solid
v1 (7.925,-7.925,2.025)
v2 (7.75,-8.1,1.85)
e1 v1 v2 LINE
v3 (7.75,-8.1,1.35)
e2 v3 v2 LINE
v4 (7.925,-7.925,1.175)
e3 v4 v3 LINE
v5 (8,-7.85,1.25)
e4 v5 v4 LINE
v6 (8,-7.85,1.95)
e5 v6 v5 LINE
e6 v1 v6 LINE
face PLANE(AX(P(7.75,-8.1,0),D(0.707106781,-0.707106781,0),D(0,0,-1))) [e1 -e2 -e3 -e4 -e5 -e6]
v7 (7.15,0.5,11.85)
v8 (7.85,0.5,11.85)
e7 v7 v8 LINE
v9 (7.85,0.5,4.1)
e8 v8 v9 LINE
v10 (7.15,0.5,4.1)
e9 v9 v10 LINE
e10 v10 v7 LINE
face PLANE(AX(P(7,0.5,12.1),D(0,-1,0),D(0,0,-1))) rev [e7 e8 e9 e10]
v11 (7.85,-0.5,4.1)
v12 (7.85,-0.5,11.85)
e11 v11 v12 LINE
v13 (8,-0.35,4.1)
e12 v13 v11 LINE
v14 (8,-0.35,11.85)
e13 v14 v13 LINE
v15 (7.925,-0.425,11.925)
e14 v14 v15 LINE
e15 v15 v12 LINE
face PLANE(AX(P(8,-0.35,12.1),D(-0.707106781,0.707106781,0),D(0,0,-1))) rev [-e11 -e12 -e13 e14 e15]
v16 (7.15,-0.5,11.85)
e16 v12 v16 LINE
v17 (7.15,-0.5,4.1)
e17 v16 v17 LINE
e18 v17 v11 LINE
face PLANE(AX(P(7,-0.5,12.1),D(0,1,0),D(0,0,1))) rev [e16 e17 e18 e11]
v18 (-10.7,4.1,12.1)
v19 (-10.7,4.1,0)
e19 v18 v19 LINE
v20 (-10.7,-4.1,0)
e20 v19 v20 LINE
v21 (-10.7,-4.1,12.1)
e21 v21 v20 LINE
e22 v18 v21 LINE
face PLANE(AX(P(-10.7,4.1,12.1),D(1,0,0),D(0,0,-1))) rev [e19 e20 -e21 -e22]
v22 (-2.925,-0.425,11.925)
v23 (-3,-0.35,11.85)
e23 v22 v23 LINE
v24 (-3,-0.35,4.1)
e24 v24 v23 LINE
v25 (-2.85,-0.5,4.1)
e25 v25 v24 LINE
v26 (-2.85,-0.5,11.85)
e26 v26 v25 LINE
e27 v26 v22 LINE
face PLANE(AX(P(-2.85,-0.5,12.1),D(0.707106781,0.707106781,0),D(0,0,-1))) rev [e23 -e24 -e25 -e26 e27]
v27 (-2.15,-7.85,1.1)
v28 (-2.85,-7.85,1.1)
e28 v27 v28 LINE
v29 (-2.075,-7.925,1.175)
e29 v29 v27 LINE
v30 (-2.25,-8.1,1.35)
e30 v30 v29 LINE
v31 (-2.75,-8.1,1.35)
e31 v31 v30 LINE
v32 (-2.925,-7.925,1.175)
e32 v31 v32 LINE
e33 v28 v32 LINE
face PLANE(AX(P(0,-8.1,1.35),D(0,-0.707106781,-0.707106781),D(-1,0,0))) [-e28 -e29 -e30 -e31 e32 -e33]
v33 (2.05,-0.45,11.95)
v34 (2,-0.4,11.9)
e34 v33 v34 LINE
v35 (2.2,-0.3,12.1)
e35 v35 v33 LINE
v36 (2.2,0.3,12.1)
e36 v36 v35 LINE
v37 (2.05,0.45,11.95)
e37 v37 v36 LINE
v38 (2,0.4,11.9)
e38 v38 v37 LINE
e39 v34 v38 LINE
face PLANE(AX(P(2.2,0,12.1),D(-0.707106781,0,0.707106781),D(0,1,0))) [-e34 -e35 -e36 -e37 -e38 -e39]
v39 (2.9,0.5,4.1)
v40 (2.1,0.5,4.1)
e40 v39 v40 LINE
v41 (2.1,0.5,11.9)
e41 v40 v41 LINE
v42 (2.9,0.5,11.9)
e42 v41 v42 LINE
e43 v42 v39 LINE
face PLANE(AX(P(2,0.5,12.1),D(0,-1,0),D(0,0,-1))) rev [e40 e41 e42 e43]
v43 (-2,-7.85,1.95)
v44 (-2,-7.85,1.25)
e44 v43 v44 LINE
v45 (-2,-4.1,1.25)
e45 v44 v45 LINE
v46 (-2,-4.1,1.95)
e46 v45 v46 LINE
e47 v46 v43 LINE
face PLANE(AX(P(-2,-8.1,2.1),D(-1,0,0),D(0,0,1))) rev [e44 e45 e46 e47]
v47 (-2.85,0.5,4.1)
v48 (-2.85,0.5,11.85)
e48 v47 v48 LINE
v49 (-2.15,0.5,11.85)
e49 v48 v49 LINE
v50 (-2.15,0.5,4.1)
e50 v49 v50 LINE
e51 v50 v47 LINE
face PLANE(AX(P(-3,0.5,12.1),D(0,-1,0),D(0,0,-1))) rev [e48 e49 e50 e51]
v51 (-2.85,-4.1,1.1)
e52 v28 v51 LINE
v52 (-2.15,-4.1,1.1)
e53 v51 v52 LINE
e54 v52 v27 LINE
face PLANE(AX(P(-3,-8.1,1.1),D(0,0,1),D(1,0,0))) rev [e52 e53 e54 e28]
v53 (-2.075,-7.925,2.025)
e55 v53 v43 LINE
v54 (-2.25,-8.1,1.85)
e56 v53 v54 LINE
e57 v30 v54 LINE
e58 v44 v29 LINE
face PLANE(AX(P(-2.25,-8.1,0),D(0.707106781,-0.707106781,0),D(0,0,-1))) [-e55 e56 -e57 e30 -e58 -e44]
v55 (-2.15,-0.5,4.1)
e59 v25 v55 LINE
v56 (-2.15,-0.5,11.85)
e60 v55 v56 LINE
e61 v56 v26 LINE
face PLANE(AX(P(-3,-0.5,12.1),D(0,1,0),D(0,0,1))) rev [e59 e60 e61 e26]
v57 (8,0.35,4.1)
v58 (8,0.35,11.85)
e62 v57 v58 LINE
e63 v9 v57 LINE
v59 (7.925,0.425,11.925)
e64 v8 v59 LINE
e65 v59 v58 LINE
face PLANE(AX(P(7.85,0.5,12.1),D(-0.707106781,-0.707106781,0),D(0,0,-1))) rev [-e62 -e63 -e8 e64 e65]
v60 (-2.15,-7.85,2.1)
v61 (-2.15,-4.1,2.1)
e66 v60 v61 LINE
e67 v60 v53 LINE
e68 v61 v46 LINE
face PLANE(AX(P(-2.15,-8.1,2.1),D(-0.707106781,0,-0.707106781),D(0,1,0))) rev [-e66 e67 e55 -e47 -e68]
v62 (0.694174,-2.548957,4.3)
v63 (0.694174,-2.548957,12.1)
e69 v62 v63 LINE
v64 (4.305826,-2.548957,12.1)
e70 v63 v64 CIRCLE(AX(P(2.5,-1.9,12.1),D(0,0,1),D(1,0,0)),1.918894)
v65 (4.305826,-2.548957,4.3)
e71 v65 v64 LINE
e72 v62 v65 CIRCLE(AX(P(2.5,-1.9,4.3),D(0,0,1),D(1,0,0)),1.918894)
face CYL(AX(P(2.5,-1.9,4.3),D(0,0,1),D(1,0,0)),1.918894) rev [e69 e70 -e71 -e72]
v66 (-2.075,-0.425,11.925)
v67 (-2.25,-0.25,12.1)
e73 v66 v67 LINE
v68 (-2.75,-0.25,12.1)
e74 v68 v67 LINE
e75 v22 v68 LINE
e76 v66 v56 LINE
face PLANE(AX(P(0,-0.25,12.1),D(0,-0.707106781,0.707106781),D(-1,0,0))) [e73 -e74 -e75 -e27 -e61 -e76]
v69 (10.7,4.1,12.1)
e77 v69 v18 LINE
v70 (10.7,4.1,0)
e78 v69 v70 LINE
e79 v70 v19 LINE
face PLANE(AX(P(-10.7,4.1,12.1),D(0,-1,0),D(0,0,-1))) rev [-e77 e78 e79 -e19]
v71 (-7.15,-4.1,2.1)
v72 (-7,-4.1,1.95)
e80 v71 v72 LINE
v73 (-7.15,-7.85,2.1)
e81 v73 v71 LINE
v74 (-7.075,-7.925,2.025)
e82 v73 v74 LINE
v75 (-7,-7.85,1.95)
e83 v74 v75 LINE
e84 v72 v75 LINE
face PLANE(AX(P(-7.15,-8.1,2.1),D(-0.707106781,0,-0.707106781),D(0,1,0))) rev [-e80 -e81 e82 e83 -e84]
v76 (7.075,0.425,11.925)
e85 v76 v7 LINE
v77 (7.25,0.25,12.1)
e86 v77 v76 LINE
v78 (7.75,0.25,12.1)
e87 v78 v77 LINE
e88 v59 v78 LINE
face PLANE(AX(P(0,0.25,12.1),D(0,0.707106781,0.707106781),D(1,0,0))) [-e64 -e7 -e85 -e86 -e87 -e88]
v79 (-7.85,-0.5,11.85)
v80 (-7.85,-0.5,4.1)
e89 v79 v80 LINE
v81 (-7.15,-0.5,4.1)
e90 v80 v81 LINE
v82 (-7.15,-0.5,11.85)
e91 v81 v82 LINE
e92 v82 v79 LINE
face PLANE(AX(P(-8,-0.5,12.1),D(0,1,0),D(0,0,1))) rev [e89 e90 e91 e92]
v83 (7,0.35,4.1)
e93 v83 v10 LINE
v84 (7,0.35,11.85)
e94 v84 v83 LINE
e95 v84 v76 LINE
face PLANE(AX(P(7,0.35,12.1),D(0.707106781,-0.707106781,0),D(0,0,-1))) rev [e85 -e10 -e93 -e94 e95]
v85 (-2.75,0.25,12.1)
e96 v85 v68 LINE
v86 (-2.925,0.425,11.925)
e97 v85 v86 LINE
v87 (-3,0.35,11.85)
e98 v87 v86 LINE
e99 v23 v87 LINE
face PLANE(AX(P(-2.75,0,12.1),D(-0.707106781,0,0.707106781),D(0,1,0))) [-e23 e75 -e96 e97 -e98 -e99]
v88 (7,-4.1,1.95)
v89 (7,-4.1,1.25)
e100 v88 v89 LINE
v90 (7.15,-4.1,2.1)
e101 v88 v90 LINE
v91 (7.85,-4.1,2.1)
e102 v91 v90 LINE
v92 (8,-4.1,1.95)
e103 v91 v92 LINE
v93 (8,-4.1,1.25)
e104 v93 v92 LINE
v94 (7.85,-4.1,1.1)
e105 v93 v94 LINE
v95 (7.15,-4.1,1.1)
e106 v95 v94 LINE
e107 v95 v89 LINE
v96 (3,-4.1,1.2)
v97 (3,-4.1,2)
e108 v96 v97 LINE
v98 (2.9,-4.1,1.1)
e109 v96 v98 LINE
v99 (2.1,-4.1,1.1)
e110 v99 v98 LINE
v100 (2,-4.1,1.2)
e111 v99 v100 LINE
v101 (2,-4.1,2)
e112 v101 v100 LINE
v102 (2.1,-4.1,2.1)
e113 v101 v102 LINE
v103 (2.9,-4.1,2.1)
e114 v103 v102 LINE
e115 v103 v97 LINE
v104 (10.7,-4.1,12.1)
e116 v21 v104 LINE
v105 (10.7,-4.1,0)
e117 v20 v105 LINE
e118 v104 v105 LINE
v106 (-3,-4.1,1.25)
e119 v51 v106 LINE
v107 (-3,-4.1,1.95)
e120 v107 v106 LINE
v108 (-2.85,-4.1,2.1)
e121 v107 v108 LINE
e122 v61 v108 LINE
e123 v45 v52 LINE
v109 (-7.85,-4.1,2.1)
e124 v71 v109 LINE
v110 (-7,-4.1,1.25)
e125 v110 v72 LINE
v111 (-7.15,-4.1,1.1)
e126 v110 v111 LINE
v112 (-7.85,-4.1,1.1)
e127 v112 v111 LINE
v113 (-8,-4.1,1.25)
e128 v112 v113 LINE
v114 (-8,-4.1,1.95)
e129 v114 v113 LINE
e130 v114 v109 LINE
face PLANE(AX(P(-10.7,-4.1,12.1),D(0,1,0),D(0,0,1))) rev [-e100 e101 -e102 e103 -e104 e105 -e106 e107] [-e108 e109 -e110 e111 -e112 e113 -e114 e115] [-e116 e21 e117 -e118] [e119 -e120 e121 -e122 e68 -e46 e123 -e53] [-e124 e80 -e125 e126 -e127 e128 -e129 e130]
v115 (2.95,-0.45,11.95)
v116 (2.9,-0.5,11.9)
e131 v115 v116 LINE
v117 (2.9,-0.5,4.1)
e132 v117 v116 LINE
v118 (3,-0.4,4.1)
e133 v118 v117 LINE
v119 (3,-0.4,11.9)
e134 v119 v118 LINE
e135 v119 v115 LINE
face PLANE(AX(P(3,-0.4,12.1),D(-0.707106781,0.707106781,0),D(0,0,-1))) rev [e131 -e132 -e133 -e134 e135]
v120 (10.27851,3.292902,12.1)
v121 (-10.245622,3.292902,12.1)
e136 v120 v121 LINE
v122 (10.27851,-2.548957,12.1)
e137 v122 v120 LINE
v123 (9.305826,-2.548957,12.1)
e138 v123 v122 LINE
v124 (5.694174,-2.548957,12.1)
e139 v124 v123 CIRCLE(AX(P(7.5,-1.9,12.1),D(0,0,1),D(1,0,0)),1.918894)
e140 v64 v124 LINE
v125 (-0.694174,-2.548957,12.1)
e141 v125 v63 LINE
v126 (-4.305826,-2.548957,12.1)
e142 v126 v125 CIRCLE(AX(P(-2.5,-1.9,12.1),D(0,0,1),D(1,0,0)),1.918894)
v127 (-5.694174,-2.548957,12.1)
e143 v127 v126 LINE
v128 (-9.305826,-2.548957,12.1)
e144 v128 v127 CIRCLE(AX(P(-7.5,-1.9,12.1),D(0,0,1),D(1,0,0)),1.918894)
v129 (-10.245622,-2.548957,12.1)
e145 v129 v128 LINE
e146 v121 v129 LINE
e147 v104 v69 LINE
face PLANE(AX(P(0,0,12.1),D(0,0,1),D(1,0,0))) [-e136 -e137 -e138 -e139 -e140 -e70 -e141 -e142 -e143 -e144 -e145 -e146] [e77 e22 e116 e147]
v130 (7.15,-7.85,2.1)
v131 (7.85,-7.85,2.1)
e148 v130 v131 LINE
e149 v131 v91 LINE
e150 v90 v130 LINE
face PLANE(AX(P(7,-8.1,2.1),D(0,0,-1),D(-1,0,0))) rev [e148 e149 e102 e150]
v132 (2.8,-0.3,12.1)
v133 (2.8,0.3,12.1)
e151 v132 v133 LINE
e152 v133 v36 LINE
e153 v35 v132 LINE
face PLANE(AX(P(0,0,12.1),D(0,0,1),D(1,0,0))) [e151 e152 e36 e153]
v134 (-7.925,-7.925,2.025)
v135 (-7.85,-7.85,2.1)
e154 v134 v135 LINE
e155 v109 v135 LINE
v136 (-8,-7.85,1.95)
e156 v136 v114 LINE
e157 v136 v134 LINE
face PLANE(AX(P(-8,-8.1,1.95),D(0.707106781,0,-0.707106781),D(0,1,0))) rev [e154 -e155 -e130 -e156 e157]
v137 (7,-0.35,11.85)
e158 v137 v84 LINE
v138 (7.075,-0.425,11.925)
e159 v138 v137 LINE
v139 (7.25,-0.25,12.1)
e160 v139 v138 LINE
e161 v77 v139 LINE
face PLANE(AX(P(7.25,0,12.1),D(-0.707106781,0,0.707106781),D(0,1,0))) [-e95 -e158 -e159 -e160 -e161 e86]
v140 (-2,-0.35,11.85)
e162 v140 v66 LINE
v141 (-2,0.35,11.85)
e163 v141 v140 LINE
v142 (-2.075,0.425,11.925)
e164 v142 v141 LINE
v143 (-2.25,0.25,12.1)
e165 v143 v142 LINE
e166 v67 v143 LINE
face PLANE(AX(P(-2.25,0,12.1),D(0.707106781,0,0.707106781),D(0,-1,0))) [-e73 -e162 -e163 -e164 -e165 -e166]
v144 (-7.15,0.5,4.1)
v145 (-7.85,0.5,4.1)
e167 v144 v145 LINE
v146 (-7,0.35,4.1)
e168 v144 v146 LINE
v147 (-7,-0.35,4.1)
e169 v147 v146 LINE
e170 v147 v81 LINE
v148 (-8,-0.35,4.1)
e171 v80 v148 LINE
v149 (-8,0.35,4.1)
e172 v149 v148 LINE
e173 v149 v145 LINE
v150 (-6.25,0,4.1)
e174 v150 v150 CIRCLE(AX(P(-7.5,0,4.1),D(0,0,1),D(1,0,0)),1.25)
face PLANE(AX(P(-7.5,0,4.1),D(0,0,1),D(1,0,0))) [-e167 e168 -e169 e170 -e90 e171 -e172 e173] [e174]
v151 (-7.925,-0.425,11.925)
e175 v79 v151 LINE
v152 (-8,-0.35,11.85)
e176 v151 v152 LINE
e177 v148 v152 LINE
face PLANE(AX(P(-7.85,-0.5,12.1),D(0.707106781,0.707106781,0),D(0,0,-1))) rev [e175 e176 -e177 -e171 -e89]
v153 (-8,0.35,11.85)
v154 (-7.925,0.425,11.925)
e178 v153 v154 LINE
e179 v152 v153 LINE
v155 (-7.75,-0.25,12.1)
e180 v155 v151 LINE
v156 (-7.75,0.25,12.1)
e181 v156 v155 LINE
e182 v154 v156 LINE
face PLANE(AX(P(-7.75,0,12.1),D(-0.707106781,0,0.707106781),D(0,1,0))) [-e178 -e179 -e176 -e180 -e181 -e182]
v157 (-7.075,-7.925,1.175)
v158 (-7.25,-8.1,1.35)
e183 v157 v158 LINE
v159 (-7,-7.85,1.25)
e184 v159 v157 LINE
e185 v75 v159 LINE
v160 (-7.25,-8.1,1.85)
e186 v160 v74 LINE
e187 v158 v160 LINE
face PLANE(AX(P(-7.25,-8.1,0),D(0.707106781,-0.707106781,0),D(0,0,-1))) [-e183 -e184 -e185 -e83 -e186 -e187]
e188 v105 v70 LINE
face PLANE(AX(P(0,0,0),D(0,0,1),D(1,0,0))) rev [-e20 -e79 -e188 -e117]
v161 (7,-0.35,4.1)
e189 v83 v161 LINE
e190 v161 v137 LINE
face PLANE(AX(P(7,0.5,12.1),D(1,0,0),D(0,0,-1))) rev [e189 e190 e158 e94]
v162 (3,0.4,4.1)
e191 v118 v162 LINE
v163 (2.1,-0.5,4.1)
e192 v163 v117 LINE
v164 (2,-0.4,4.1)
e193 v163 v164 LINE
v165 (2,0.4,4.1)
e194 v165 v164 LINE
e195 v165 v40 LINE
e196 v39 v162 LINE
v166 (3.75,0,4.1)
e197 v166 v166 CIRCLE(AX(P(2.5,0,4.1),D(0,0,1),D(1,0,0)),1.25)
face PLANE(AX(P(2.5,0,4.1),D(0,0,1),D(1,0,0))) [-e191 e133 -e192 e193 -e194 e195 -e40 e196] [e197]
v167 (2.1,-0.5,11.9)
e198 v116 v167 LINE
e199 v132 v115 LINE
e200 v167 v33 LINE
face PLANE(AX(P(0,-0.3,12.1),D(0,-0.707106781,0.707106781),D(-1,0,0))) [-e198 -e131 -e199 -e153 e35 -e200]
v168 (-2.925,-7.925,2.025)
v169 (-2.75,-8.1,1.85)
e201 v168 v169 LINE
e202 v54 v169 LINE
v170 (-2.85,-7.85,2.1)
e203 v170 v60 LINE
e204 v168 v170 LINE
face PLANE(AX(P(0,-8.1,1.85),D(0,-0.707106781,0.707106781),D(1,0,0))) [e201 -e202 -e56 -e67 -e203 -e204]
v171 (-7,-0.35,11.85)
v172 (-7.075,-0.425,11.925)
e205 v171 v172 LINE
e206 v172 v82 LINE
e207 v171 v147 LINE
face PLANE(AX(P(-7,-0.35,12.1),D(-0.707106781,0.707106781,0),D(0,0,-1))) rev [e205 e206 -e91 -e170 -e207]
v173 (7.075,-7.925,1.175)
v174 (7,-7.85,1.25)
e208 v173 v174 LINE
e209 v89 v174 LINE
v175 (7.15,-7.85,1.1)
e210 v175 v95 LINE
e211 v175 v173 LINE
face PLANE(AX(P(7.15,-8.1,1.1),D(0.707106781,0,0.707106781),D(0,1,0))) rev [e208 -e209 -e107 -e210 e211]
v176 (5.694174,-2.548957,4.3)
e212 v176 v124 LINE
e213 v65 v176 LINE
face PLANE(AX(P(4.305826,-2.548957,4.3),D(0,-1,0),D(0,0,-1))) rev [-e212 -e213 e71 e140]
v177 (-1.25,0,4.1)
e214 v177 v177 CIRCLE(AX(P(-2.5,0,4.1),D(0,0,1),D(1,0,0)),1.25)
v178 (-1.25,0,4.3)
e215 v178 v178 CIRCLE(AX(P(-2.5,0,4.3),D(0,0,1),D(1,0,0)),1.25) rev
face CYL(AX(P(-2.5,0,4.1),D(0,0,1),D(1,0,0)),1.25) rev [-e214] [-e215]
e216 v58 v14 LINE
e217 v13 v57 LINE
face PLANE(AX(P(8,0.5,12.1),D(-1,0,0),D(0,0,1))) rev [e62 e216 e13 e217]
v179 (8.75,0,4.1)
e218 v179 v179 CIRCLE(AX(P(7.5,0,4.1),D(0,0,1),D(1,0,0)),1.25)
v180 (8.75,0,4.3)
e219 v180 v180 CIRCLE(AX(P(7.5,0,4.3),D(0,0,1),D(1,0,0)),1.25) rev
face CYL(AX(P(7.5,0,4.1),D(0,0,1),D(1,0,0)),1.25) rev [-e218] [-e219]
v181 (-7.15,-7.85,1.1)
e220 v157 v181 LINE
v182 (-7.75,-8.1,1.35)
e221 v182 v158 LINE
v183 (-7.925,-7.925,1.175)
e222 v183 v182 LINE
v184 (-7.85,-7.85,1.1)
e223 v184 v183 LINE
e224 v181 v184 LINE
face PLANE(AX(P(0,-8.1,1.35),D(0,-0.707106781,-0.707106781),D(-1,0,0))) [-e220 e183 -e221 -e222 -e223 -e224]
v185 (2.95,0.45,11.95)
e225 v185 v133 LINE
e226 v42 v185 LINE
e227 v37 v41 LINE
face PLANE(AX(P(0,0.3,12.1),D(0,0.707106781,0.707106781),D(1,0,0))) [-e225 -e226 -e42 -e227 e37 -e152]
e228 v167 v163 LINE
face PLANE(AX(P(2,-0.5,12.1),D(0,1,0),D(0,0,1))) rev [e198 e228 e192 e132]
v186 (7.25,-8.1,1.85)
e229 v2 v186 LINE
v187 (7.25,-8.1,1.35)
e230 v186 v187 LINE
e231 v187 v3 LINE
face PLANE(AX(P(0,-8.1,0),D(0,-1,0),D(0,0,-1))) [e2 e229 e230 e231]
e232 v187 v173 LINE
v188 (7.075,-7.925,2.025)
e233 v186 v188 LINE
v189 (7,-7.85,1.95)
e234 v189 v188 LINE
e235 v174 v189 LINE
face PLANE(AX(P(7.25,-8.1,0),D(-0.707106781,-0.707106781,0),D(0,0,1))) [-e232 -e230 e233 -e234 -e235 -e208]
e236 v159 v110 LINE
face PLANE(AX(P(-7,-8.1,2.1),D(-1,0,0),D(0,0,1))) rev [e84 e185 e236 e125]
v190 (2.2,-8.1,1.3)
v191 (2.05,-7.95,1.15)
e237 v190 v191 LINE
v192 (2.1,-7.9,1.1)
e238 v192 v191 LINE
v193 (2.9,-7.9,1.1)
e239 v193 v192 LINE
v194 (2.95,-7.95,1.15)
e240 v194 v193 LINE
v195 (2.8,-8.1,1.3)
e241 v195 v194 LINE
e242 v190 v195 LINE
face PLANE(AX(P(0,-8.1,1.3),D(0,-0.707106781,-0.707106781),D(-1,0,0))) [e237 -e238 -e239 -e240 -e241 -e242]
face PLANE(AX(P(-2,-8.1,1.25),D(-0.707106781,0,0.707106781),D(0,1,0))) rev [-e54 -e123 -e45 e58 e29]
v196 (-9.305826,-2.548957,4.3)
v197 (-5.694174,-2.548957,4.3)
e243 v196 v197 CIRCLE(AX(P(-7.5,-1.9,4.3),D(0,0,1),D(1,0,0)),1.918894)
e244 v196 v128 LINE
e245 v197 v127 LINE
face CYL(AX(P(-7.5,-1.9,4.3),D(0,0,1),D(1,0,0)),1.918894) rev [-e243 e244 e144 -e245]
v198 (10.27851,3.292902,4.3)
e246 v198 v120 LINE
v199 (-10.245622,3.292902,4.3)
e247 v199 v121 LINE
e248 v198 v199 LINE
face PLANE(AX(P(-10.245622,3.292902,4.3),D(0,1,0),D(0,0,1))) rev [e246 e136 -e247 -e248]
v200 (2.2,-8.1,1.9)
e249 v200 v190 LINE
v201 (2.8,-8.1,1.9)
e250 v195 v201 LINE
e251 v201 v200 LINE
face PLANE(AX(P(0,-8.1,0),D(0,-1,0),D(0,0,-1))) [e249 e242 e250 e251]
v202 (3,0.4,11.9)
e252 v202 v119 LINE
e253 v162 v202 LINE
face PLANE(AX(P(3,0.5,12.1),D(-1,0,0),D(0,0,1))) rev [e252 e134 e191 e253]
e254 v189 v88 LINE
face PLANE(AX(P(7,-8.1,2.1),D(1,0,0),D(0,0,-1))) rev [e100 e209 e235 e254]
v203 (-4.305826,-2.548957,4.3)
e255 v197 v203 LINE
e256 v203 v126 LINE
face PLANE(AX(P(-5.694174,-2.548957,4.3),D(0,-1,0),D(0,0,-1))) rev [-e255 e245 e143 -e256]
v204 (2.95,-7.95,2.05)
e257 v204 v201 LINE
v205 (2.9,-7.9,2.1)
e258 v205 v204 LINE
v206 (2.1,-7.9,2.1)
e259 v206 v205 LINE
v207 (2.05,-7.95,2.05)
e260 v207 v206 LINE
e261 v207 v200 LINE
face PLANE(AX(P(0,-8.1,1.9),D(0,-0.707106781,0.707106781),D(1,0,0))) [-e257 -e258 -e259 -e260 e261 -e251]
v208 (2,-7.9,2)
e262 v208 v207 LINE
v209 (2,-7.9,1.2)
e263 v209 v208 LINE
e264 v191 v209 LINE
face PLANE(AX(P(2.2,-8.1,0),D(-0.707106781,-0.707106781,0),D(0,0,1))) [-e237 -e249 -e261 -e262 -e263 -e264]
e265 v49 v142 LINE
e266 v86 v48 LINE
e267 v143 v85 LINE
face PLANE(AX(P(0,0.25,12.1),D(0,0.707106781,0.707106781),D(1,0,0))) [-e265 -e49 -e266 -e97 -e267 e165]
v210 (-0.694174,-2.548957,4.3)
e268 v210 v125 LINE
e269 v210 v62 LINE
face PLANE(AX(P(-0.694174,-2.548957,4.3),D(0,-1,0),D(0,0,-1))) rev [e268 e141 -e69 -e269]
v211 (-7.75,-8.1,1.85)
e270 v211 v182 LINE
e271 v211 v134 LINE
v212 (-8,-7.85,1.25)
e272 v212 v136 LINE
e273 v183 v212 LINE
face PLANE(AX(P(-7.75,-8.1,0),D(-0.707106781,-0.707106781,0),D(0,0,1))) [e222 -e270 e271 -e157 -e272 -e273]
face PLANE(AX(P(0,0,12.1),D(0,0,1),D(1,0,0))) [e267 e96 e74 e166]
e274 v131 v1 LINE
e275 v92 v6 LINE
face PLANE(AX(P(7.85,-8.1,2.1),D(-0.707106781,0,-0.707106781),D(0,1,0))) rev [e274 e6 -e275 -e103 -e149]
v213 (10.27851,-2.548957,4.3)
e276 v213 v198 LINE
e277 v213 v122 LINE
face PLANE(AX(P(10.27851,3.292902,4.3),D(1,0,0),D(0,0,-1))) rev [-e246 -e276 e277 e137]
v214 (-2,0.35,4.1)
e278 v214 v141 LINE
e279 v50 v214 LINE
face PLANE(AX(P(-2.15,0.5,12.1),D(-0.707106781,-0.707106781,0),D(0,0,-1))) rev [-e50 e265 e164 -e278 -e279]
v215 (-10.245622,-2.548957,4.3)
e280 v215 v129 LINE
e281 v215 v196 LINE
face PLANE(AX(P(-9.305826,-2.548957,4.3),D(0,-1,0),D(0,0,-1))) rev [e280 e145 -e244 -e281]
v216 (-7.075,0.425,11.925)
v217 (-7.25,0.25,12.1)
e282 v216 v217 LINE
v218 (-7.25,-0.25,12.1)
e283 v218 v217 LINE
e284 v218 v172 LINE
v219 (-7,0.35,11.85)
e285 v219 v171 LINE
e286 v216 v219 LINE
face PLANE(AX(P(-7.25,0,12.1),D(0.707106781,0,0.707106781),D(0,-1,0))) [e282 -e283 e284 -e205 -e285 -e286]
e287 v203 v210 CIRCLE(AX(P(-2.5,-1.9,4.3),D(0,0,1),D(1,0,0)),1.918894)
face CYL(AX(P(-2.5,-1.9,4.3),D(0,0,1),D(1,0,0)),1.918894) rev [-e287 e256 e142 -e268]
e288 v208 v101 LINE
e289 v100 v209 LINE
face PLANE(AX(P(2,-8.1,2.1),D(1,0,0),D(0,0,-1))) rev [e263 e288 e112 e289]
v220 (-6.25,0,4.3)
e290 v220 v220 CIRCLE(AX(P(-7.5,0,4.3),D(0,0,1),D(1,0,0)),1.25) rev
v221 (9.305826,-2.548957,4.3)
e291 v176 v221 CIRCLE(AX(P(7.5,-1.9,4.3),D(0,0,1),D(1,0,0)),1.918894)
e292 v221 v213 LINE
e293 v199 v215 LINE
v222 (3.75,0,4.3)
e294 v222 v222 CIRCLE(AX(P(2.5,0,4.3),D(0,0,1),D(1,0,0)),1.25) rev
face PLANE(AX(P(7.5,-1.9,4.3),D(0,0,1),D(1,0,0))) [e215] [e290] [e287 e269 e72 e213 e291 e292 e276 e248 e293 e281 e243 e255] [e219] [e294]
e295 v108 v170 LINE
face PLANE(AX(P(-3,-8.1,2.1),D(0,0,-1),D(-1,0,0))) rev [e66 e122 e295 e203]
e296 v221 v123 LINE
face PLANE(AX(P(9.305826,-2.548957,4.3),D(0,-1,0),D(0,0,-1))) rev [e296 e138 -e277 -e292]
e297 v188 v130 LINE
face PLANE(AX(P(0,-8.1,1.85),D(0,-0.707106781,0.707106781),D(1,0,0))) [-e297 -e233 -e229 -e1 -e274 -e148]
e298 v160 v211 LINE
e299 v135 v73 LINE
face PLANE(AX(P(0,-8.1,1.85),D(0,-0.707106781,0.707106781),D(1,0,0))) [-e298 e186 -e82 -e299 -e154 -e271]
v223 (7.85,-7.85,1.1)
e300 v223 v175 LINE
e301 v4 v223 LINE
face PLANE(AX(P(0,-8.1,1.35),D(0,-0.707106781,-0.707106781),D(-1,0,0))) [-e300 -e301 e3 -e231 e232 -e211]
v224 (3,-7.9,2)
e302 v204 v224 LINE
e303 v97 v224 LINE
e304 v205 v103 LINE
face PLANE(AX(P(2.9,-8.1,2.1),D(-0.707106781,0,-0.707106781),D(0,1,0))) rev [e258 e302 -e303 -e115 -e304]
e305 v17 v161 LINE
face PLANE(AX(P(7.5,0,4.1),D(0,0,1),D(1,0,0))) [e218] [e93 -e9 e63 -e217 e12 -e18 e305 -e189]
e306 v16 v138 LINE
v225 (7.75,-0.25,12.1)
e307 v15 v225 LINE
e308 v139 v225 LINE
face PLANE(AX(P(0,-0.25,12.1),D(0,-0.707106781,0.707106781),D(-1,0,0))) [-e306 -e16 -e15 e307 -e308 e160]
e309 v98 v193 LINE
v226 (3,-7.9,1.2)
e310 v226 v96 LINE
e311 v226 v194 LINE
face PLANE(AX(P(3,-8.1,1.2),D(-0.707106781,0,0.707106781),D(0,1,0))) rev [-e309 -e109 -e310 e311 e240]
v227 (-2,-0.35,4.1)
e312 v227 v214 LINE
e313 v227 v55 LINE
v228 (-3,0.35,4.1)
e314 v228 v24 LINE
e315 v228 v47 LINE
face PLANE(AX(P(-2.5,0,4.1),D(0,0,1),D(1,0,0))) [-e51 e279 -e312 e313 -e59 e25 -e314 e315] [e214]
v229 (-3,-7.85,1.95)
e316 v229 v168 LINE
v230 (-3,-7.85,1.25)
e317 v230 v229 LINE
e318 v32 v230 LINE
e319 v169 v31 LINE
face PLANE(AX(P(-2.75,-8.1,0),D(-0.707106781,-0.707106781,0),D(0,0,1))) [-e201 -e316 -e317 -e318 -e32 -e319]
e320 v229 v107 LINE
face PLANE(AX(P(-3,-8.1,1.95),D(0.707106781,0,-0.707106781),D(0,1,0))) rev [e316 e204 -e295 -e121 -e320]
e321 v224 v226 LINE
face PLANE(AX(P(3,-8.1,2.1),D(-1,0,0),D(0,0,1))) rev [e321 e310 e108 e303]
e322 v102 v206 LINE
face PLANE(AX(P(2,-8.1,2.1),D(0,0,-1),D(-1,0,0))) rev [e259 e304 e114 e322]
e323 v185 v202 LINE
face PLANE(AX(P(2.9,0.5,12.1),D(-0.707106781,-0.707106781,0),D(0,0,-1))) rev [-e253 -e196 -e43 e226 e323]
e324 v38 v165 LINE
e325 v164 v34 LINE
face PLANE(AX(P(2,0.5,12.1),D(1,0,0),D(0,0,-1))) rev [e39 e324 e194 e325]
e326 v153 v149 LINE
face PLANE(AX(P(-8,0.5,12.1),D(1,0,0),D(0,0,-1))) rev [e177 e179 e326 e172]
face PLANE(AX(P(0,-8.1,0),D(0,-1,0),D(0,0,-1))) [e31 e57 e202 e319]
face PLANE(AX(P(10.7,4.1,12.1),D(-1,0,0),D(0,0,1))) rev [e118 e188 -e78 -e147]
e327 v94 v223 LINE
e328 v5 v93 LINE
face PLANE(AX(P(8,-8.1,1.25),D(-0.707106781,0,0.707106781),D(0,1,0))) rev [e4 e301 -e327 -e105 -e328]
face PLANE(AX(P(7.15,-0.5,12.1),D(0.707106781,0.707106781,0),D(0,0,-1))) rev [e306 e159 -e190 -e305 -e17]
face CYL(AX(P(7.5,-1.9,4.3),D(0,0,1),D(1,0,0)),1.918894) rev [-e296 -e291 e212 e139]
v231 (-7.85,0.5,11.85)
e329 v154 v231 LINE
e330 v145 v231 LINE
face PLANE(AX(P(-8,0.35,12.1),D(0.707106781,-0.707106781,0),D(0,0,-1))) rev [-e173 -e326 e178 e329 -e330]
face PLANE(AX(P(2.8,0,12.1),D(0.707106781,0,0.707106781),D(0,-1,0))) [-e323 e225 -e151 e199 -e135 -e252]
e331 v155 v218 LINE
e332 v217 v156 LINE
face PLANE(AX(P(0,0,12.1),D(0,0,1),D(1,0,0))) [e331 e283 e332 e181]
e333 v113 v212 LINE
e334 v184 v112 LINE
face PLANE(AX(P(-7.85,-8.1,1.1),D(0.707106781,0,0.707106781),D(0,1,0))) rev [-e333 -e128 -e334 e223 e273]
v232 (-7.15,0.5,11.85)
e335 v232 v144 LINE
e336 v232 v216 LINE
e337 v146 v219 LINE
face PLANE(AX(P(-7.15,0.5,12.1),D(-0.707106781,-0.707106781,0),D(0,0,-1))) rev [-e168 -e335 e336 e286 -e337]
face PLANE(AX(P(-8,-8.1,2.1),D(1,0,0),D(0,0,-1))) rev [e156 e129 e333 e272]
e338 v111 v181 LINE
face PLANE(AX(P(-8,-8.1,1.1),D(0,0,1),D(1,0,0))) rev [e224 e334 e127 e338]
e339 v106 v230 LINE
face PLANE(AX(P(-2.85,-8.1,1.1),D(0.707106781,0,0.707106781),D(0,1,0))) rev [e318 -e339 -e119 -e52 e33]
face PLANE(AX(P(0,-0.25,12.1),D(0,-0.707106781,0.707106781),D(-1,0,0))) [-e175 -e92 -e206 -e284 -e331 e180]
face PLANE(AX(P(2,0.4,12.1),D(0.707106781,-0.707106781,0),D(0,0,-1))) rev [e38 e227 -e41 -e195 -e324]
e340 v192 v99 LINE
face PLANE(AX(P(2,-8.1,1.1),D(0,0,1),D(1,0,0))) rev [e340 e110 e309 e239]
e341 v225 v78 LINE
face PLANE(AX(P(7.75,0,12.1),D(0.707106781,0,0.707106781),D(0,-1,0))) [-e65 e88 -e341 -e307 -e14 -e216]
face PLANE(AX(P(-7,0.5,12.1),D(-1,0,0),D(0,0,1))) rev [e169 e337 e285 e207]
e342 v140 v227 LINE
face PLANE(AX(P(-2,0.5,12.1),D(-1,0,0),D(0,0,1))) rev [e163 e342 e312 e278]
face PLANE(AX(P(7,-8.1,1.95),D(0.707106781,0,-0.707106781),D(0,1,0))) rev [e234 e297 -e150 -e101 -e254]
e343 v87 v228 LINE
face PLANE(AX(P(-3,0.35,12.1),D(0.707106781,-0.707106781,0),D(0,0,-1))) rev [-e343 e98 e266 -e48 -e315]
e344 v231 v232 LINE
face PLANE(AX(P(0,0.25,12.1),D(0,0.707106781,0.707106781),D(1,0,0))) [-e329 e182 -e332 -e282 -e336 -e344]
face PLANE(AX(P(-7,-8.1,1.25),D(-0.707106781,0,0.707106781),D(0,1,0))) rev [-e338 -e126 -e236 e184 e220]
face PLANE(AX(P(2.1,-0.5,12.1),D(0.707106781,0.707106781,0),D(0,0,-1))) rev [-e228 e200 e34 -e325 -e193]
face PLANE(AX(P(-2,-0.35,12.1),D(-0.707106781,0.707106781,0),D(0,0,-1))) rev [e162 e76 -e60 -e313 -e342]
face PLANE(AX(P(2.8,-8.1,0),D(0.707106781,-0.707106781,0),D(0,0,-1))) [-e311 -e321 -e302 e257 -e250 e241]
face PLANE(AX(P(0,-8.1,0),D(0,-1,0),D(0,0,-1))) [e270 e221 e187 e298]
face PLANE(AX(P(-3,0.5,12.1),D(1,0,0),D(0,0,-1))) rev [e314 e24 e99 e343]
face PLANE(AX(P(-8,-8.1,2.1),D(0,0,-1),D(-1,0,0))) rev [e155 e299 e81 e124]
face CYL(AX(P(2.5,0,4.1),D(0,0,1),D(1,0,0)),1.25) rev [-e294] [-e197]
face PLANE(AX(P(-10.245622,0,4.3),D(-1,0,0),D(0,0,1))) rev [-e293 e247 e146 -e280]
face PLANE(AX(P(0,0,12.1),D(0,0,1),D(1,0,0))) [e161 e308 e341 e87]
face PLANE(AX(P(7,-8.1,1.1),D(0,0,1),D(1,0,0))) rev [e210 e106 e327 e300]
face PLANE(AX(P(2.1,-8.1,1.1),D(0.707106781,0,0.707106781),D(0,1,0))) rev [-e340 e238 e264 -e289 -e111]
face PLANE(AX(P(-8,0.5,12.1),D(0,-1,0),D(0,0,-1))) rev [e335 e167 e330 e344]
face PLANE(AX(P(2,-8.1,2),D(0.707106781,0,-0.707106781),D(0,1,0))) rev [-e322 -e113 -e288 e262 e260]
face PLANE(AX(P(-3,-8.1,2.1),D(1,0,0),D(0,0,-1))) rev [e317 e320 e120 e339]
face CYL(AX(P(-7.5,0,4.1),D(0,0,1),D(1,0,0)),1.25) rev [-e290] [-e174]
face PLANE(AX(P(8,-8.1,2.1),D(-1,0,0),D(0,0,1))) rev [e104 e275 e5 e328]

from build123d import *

# Parameters (mm, degrees)
SKETCH_1_W          = 21.4
SKETCH_1_H          = 8.2
EXTRUDE_1_DEPTH     = 12.1
SKETCH_4_R          = 1.25
CUT_EXTRUDE_3_DEPTH = 8
CUT_EXTRUDE_4_DEPTH = 7.8
SKETCH_7_W          = 1
SKETCH_7_H          = 1
EXTRUDE_2_DEPTH     = 8
CHAMFER_1_SIZE      = 0.15
CHAMFER_2_SIZE      = 0.25
SKETCH_8_W          = 1
SKETCH_8_H          = 1
EXTRUDE_3_DEPTH     = 4
CHAMFER_3_SIZE      = 0.15
CHAMFER_4_SIZE      = 0.25
CHAMFER_6_SIZE      = 0.1
CHAMFER_7_SIZE      = 0.2
CHAMFER_8_SIZE      = 0.1
CHAMFER_9_SIZE      = 0.2


with BuildPart() as part:
    # Эскиз1 → Бобышка-Вытянуть1 (new body)
    with BuildSketch(Plane.XY):
        Rectangle(SKETCH_1_W, SKETCH_1_H)
    extrude(amount=EXTRUDE_1_DEPTH)

    # Эскиз4 → Вырез-Вытянуть3 (cut)
    with BuildSketch(Plane.XY.offset(12.1)):
        with Locations((-7.5, 0)):
            Circle(SKETCH_4_R)
        with Locations((-2.5, 0)):
            Circle(SKETCH_4_R)
        with Locations((2.5, 0)):
            Circle(SKETCH_4_R)
        with Locations((7.5, 0)):
            Circle(SKETCH_4_R)
    extrude(amount=-CUT_EXTRUDE_3_DEPTH, mode=Mode.SUBTRACT)

    # Эскиз5 → Вырез-Вытянуть4 (cut)
    with BuildSketch(Plane.XY.offset(12.1)):
        with BuildLine():
            Line((-10.245621634, 0), (-10.245621634, 3.292901982))
            Line((-10.245621634, 3.292901982), (0.278509544, 3.292901982))
            Line((0.278509544, 3.292901982), (5.278509544, 3.292901982))
            Line((5.278509544, 3.292901982), (10.278509544, 3.292901982))
            Line((10.278509544, 3.292901982), (10.278509544, -2.548957219))
            Line((10.278509544, -2.548957219), (9.30582632, -2.548957219))
            ThreePointArc((9.30582632, -2.548957219), (7.5, -3.818893996), (5.69417368, -2.548957219))
            Line((5.69417368, -2.548957219), (4.30582632, -2.548957219))
            ThreePointArc((4.30582632, -2.548957219), (2.5, -3.818893996), (0.69417368, -2.548957219))
            Line((0.69417368, -2.548957219), (-0.69417368, -2.548957219))
            ThreePointArc((-0.69417368, -2.548957219), (-2.5, -3.818893996), (-4.30582632, -2.548957219))
            Line((-4.30582632, -2.548957219), (-5.69417368, -2.548957219))
            ThreePointArc((-5.69417368, -2.548957219), (-7.5, -3.818893996), (-9.30582632, -2.548957219))
            Line((-9.30582632, -2.548957219), (-10.245621634, -2.548957219))
            Line((-10.245621634, -2.548957219), (-10.245621634, 0))
        make_face()
    extrude(amount=-CUT_EXTRUDE_4_DEPTH, mode=Mode.SUBTRACT)

    # Эскиз7 → Бобышка-Вытянуть2 (add)
    with BuildSketch(Plane.XY.offset(4.1)):
        with Locations((-2.5, 0)):
            Rectangle(SKETCH_7_W, SKETCH_7_H)
        with Locations((-7.5, 0)):
            Rectangle(SKETCH_7_W, SKETCH_7_H)
        with Locations((2.5, 0)):
            Rectangle(SKETCH_7_W, SKETCH_7_H)
        with Locations((7.5, 0)):
            Rectangle(SKETCH_7_W, SKETCH_7_H)
    extrude(amount=EXTRUDE_2_DEPTH)

    # Фаска1
    chamfer_1_edges = [part.edges().sort_by_distance(p)[0] for p in [
        (-7, -0.5, 8.1),
        (-7, 0.5, 8.1),
        (-8, 0.5, 8.1),
        (-8, -0.5, 8.1),
        (-2, -0.5, 8.1),
        (-2, 0.5, 8.1),
        (-3, 0.5, 8.1),
        (-3, -0.5, 8.1),
    ]]
    chamfer(chamfer_1_edges, length=CHAMFER_1_SIZE)

    # Фаска2
    # the kernel refuses this chamfer: 0.25 mm, written as the material it takes off along each edge
    with BuildSketch(Plane(origin=(-3, -0.992920747, 12.1), x_dir=(-0.02749587661058555, 0, -0.9996219169112968), z_dir=(0, 1, 0)), Plane(origin=(-3.492920747, 0.5, 12.1), x_dir=(0, 0.027495876610586414, -0.9996219169112968), z_dir=(1, 0, 0)), Plane(origin=(-2, 0.992920747, 12.1), x_dir=(0.027495876610586414, 0, -0.9996219169112968), z_dir=(0, -1, 0)), Plane(origin=(-1.507079253, -0.5, 12.1), x_dir=(0, -0.027495876610586414, -0.9996219169112968), z_dir=(-1, 0, 0)), Plane(origin=(-7, 0.992920747, 12.1), x_dir=(0.02749587661058555, 0, -0.9996219169112968), z_dir=(0, -1, 0)), Plane(origin=(-6.507079253, -0.5, 12.1), x_dir=(0, -0.027495876610586414, -0.9996219169112968), z_dir=(-1, 0, 0)), Plane(origin=(-8, -0.992920747, 12.1), x_dir=(-0.027495876610589005, 0, -0.9996219169112968), z_dir=(0, 1, 0)), Plane(origin=(-8.492920747, 0.5, 12.1), x_dir=(0, 0.027495876610586414, -0.9996219169112968), z_dir=(1, 0, 0))) as chamfer_2_piece_1:
        Polygon((CHAMFER_2_SIZE * 0.999621916911, -CHAMFER_2_SIZE * 0.0274958766106), (-CHAMFER_2_SIZE * 0.0274958766106, -CHAMFER_2_SIZE * 0.999621916911), (0, 0), align=None)
    extrude(amount=1.985841494, mode=Mode.SUBTRACT)

    # Эскиз8 → Бобышка-Вытянуть3 (add)
    with BuildSketch(Plane(origin=(0, -4.1, 0), x_dir=(-1, 0, 0), z_dir=(0, -1, 0))):
        with Locations((2.5, -1.6)):
            Rectangle(SKETCH_8_W, SKETCH_8_H)
        with Locations((7.5, -1.6)):
            Rectangle(SKETCH_8_W, SKETCH_8_H)
        with Locations((-2.5, -1.6)):
            Rectangle(SKETCH_8_W, SKETCH_8_H)
        with Locations((-7.5, -1.6)):
            Rectangle(SKETCH_8_W, SKETCH_8_H)
    extrude(amount=EXTRUDE_3_DEPTH)

    # Фаска3
    chamfer_3_edges = [part.edges().sort_by_distance(p)[0] for p in [
        (8, -0.5, 8.1),
        (8, 0.5, 8.1),
        (7, 0.5, 8.1),
        (7, -0.5, 8.1),
        (-7, -6.1, 1.1),
        (-7, -6.1, 2.1),
        (-8, -6.1, 2.1),
        (-8, -6.1, 1.1),
        (-2, -6.1, 1.1),
        (-2, -6.1, 2.1),
        (-3, -6.1, 2.1),
        (-3, -6.1, 1.1),
        (8, -6.1, 1.1),
        (8, -6.1, 2.1),
        (7, -6.1, 2.1),
        (7, -6.1, 1.1),
    ]]
    chamfer(chamfer_3_edges, length=CHAMFER_3_SIZE)

    # Фаска4
    # the kernel refuses this chamfer: 0.25 mm, written as the material it takes off along each edge
    with BuildSketch(Plane(origin=(-2, -8.1, 2.592920747), x_dir=(0.02749587661058651, 0.9996219169112968, 0), z_dir=(0, 0, -1)), Plane(origin=(-3, -8.1, 0.607079253), x_dir=(-0.027495876610585647, 0.9996219169112968, 0), z_dir=(0, 0, 1)), Plane(origin=(-3.492920747, -8.1, 2.1), x_dir=(0, 0.9996219169112968, 0.027495876610585647), z_dir=(1, 0, 0)), Plane(origin=(-1.507079253, -8.1, 1.1), x_dir=(0, 0.9996219169112968, -0.02749587661058651), z_dir=(-1, 0, 0)), Plane(origin=(-8, -8.1, 0.607079253), x_dir=(-0.0274958766105891, 0.9996219169112968, 0), z_dir=(0, 0, 1)), Plane(origin=(-8.492920747, -8.1, 2.1), x_dir=(0, 0.9996219169112968, 0.027495876610585647), z_dir=(1, 0, 0)), Plane(origin=(-7, -8.1, 2.592920747), x_dir=(0.027495876610585647, 0.9996219169112968, 0), z_dir=(0, 0, -1)), Plane(origin=(-6.507079253, -8.1, 1.1), x_dir=(0, 0.9996219169112968, -0.02749587661058651), z_dir=(-1, 0, 0)), Plane(origin=(8.492920747, -8.1, 1.1), x_dir=(0, 0.9996219169112968, -0.02749587661058651), z_dir=(-1, 0, 0)), Plane(origin=(7, -8.1, 0.607079253), x_dir=(-0.027495876610585647, 0.9996219169112968, 0), z_dir=(0, 0, 1)), Plane(origin=(6.507079253, -8.1, 2.1), x_dir=(0, 0.9996219169112968, 0.027495876610585647), z_dir=(1, 0, 0)), Plane(origin=(8, -8.1, 2.592920747), x_dir=(0.0274958766105891, 0.9996219169112968, 0), z_dir=(0, 0, -1)), Plane(origin=(8.492920747, -0.5, 12.1), x_dir=(0, -0.027495876610586414, -0.9996219169112968), z_dir=(-1, 0, 0)), Plane(origin=(7, -0.992920747, 12.1), x_dir=(-0.02749587661058555, 0, -0.9996219169112968), z_dir=(0, 1, 0)), Plane(origin=(8, 0.992920747, 12.1), x_dir=(0.027495876610589005, 0, -0.9996219169112968), z_dir=(0, -1, 0)), Plane(origin=(6.507079253, 0.5, 12.1), x_dir=(0, 0.027495876610586414, -0.9996219169112968), z_dir=(1, 0, 0))) as chamfer_4_piece_1:
        Polygon((CHAMFER_4_SIZE * 0.999621916911, -CHAMFER_4_SIZE * 0.0274958766106), (-CHAMFER_4_SIZE * 0.0274958766106, -CHAMFER_4_SIZE * 0.999621916911), (0, 0), align=None)
    extrude(amount=1.985841494, mode=Mode.SUBTRACT)

    # Фаска6
    chamfer_6_edges = [part.edges().sort_by_distance(p)[0] for p in [
        (3, -0.5, 8.1),
        (3, 0.5, 8.1),
        (2, 0.5, 8.1),
        (2, -0.5, 8.1),
    ]]
    chamfer(chamfer_6_edges, length=CHAMFER_6_SIZE)

    # Фаска7
    # the kernel refuses this chamfer: 0.2 mm, written as the material it takes off along each edge
    with BuildSketch(Plane(origin=(3, 0.914336598, 12.1), x_dir=(0.02749587661058742, 0, -0.9996219169112966), z_dir=(0, -1, 0)), Plane(origin=(3.414336598, -0.5, 12.1), x_dir=(0, -0.02749587661058634, -0.9996219169112966), z_dir=(-1, 0, 0)), Plane(origin=(2, -0.914336598, 12.1), x_dir=(-0.02749587661058634, 0, -0.9996219169112966), z_dir=(0, 1, 0)), Plane(origin=(1.585663402, 0.5, 12.1), x_dir=(0, 0.02749587661058634, -0.9996219169112966), z_dir=(1, 0, 0))) as chamfer_7_piece_1:
        Polygon((CHAMFER_7_SIZE * 0.999621916911, -CHAMFER_7_SIZE * 0.0274958766106), (-CHAMFER_7_SIZE * 0.0274958766106, -CHAMFER_7_SIZE * 0.999621916911), (0, 0), align=None)
    extrude(amount=1.828673195, mode=Mode.SUBTRACT)

    # Фаска8
    chamfer_8_edges = [part.edges().sort_by_distance(p)[0] for p in [
        (3, -6.1, 1.1),
        (3, -6.1, 2.1),
        (2, -6.1, 2.1),
        (2, -6.1, 1.1),
    ]]
    chamfer(chamfer_8_edges, length=CHAMFER_8_SIZE)

    # Фаска9
    # the kernel refuses this chamfer: 0.2 mm, written as the material it takes off along each edge
    with BuildSketch(Plane(origin=(3, -8.1, 2.514336598), x_dir=(0.027495876610587302, 0.9996219169112966, 0), z_dir=(0, 0, -1)), Plane(origin=(3.414336598, -8.1, 1.1), x_dir=(0, 0.9996219169112968, -0.027495876610586226), z_dir=(-1, 0, 0)), Plane(origin=(2, -8.1, 0.685663402), x_dir=(-0.027495876610586223, 0.9996219169112966, 0), z_dir=(0, 0, 1)), Plane(origin=(1.585663402, -8.1, 2.1), x_dir=(0, 0.9996219169112966, 0.027495876610587302), z_dir=(1, 0, 0))) as chamfer_9_piece_1:
        Polygon((CHAMFER_9_SIZE * 0.999621916911, -CHAMFER_9_SIZE * 0.0274958766106), (-CHAMFER_9_SIZE * 0.0274958766106, -CHAMFER_9_SIZE * 0.999621916911), (0, 0), align=None)
    extrude(amount=1.828673195, mode=Mode.SUBTRACT)


solid = part.part
